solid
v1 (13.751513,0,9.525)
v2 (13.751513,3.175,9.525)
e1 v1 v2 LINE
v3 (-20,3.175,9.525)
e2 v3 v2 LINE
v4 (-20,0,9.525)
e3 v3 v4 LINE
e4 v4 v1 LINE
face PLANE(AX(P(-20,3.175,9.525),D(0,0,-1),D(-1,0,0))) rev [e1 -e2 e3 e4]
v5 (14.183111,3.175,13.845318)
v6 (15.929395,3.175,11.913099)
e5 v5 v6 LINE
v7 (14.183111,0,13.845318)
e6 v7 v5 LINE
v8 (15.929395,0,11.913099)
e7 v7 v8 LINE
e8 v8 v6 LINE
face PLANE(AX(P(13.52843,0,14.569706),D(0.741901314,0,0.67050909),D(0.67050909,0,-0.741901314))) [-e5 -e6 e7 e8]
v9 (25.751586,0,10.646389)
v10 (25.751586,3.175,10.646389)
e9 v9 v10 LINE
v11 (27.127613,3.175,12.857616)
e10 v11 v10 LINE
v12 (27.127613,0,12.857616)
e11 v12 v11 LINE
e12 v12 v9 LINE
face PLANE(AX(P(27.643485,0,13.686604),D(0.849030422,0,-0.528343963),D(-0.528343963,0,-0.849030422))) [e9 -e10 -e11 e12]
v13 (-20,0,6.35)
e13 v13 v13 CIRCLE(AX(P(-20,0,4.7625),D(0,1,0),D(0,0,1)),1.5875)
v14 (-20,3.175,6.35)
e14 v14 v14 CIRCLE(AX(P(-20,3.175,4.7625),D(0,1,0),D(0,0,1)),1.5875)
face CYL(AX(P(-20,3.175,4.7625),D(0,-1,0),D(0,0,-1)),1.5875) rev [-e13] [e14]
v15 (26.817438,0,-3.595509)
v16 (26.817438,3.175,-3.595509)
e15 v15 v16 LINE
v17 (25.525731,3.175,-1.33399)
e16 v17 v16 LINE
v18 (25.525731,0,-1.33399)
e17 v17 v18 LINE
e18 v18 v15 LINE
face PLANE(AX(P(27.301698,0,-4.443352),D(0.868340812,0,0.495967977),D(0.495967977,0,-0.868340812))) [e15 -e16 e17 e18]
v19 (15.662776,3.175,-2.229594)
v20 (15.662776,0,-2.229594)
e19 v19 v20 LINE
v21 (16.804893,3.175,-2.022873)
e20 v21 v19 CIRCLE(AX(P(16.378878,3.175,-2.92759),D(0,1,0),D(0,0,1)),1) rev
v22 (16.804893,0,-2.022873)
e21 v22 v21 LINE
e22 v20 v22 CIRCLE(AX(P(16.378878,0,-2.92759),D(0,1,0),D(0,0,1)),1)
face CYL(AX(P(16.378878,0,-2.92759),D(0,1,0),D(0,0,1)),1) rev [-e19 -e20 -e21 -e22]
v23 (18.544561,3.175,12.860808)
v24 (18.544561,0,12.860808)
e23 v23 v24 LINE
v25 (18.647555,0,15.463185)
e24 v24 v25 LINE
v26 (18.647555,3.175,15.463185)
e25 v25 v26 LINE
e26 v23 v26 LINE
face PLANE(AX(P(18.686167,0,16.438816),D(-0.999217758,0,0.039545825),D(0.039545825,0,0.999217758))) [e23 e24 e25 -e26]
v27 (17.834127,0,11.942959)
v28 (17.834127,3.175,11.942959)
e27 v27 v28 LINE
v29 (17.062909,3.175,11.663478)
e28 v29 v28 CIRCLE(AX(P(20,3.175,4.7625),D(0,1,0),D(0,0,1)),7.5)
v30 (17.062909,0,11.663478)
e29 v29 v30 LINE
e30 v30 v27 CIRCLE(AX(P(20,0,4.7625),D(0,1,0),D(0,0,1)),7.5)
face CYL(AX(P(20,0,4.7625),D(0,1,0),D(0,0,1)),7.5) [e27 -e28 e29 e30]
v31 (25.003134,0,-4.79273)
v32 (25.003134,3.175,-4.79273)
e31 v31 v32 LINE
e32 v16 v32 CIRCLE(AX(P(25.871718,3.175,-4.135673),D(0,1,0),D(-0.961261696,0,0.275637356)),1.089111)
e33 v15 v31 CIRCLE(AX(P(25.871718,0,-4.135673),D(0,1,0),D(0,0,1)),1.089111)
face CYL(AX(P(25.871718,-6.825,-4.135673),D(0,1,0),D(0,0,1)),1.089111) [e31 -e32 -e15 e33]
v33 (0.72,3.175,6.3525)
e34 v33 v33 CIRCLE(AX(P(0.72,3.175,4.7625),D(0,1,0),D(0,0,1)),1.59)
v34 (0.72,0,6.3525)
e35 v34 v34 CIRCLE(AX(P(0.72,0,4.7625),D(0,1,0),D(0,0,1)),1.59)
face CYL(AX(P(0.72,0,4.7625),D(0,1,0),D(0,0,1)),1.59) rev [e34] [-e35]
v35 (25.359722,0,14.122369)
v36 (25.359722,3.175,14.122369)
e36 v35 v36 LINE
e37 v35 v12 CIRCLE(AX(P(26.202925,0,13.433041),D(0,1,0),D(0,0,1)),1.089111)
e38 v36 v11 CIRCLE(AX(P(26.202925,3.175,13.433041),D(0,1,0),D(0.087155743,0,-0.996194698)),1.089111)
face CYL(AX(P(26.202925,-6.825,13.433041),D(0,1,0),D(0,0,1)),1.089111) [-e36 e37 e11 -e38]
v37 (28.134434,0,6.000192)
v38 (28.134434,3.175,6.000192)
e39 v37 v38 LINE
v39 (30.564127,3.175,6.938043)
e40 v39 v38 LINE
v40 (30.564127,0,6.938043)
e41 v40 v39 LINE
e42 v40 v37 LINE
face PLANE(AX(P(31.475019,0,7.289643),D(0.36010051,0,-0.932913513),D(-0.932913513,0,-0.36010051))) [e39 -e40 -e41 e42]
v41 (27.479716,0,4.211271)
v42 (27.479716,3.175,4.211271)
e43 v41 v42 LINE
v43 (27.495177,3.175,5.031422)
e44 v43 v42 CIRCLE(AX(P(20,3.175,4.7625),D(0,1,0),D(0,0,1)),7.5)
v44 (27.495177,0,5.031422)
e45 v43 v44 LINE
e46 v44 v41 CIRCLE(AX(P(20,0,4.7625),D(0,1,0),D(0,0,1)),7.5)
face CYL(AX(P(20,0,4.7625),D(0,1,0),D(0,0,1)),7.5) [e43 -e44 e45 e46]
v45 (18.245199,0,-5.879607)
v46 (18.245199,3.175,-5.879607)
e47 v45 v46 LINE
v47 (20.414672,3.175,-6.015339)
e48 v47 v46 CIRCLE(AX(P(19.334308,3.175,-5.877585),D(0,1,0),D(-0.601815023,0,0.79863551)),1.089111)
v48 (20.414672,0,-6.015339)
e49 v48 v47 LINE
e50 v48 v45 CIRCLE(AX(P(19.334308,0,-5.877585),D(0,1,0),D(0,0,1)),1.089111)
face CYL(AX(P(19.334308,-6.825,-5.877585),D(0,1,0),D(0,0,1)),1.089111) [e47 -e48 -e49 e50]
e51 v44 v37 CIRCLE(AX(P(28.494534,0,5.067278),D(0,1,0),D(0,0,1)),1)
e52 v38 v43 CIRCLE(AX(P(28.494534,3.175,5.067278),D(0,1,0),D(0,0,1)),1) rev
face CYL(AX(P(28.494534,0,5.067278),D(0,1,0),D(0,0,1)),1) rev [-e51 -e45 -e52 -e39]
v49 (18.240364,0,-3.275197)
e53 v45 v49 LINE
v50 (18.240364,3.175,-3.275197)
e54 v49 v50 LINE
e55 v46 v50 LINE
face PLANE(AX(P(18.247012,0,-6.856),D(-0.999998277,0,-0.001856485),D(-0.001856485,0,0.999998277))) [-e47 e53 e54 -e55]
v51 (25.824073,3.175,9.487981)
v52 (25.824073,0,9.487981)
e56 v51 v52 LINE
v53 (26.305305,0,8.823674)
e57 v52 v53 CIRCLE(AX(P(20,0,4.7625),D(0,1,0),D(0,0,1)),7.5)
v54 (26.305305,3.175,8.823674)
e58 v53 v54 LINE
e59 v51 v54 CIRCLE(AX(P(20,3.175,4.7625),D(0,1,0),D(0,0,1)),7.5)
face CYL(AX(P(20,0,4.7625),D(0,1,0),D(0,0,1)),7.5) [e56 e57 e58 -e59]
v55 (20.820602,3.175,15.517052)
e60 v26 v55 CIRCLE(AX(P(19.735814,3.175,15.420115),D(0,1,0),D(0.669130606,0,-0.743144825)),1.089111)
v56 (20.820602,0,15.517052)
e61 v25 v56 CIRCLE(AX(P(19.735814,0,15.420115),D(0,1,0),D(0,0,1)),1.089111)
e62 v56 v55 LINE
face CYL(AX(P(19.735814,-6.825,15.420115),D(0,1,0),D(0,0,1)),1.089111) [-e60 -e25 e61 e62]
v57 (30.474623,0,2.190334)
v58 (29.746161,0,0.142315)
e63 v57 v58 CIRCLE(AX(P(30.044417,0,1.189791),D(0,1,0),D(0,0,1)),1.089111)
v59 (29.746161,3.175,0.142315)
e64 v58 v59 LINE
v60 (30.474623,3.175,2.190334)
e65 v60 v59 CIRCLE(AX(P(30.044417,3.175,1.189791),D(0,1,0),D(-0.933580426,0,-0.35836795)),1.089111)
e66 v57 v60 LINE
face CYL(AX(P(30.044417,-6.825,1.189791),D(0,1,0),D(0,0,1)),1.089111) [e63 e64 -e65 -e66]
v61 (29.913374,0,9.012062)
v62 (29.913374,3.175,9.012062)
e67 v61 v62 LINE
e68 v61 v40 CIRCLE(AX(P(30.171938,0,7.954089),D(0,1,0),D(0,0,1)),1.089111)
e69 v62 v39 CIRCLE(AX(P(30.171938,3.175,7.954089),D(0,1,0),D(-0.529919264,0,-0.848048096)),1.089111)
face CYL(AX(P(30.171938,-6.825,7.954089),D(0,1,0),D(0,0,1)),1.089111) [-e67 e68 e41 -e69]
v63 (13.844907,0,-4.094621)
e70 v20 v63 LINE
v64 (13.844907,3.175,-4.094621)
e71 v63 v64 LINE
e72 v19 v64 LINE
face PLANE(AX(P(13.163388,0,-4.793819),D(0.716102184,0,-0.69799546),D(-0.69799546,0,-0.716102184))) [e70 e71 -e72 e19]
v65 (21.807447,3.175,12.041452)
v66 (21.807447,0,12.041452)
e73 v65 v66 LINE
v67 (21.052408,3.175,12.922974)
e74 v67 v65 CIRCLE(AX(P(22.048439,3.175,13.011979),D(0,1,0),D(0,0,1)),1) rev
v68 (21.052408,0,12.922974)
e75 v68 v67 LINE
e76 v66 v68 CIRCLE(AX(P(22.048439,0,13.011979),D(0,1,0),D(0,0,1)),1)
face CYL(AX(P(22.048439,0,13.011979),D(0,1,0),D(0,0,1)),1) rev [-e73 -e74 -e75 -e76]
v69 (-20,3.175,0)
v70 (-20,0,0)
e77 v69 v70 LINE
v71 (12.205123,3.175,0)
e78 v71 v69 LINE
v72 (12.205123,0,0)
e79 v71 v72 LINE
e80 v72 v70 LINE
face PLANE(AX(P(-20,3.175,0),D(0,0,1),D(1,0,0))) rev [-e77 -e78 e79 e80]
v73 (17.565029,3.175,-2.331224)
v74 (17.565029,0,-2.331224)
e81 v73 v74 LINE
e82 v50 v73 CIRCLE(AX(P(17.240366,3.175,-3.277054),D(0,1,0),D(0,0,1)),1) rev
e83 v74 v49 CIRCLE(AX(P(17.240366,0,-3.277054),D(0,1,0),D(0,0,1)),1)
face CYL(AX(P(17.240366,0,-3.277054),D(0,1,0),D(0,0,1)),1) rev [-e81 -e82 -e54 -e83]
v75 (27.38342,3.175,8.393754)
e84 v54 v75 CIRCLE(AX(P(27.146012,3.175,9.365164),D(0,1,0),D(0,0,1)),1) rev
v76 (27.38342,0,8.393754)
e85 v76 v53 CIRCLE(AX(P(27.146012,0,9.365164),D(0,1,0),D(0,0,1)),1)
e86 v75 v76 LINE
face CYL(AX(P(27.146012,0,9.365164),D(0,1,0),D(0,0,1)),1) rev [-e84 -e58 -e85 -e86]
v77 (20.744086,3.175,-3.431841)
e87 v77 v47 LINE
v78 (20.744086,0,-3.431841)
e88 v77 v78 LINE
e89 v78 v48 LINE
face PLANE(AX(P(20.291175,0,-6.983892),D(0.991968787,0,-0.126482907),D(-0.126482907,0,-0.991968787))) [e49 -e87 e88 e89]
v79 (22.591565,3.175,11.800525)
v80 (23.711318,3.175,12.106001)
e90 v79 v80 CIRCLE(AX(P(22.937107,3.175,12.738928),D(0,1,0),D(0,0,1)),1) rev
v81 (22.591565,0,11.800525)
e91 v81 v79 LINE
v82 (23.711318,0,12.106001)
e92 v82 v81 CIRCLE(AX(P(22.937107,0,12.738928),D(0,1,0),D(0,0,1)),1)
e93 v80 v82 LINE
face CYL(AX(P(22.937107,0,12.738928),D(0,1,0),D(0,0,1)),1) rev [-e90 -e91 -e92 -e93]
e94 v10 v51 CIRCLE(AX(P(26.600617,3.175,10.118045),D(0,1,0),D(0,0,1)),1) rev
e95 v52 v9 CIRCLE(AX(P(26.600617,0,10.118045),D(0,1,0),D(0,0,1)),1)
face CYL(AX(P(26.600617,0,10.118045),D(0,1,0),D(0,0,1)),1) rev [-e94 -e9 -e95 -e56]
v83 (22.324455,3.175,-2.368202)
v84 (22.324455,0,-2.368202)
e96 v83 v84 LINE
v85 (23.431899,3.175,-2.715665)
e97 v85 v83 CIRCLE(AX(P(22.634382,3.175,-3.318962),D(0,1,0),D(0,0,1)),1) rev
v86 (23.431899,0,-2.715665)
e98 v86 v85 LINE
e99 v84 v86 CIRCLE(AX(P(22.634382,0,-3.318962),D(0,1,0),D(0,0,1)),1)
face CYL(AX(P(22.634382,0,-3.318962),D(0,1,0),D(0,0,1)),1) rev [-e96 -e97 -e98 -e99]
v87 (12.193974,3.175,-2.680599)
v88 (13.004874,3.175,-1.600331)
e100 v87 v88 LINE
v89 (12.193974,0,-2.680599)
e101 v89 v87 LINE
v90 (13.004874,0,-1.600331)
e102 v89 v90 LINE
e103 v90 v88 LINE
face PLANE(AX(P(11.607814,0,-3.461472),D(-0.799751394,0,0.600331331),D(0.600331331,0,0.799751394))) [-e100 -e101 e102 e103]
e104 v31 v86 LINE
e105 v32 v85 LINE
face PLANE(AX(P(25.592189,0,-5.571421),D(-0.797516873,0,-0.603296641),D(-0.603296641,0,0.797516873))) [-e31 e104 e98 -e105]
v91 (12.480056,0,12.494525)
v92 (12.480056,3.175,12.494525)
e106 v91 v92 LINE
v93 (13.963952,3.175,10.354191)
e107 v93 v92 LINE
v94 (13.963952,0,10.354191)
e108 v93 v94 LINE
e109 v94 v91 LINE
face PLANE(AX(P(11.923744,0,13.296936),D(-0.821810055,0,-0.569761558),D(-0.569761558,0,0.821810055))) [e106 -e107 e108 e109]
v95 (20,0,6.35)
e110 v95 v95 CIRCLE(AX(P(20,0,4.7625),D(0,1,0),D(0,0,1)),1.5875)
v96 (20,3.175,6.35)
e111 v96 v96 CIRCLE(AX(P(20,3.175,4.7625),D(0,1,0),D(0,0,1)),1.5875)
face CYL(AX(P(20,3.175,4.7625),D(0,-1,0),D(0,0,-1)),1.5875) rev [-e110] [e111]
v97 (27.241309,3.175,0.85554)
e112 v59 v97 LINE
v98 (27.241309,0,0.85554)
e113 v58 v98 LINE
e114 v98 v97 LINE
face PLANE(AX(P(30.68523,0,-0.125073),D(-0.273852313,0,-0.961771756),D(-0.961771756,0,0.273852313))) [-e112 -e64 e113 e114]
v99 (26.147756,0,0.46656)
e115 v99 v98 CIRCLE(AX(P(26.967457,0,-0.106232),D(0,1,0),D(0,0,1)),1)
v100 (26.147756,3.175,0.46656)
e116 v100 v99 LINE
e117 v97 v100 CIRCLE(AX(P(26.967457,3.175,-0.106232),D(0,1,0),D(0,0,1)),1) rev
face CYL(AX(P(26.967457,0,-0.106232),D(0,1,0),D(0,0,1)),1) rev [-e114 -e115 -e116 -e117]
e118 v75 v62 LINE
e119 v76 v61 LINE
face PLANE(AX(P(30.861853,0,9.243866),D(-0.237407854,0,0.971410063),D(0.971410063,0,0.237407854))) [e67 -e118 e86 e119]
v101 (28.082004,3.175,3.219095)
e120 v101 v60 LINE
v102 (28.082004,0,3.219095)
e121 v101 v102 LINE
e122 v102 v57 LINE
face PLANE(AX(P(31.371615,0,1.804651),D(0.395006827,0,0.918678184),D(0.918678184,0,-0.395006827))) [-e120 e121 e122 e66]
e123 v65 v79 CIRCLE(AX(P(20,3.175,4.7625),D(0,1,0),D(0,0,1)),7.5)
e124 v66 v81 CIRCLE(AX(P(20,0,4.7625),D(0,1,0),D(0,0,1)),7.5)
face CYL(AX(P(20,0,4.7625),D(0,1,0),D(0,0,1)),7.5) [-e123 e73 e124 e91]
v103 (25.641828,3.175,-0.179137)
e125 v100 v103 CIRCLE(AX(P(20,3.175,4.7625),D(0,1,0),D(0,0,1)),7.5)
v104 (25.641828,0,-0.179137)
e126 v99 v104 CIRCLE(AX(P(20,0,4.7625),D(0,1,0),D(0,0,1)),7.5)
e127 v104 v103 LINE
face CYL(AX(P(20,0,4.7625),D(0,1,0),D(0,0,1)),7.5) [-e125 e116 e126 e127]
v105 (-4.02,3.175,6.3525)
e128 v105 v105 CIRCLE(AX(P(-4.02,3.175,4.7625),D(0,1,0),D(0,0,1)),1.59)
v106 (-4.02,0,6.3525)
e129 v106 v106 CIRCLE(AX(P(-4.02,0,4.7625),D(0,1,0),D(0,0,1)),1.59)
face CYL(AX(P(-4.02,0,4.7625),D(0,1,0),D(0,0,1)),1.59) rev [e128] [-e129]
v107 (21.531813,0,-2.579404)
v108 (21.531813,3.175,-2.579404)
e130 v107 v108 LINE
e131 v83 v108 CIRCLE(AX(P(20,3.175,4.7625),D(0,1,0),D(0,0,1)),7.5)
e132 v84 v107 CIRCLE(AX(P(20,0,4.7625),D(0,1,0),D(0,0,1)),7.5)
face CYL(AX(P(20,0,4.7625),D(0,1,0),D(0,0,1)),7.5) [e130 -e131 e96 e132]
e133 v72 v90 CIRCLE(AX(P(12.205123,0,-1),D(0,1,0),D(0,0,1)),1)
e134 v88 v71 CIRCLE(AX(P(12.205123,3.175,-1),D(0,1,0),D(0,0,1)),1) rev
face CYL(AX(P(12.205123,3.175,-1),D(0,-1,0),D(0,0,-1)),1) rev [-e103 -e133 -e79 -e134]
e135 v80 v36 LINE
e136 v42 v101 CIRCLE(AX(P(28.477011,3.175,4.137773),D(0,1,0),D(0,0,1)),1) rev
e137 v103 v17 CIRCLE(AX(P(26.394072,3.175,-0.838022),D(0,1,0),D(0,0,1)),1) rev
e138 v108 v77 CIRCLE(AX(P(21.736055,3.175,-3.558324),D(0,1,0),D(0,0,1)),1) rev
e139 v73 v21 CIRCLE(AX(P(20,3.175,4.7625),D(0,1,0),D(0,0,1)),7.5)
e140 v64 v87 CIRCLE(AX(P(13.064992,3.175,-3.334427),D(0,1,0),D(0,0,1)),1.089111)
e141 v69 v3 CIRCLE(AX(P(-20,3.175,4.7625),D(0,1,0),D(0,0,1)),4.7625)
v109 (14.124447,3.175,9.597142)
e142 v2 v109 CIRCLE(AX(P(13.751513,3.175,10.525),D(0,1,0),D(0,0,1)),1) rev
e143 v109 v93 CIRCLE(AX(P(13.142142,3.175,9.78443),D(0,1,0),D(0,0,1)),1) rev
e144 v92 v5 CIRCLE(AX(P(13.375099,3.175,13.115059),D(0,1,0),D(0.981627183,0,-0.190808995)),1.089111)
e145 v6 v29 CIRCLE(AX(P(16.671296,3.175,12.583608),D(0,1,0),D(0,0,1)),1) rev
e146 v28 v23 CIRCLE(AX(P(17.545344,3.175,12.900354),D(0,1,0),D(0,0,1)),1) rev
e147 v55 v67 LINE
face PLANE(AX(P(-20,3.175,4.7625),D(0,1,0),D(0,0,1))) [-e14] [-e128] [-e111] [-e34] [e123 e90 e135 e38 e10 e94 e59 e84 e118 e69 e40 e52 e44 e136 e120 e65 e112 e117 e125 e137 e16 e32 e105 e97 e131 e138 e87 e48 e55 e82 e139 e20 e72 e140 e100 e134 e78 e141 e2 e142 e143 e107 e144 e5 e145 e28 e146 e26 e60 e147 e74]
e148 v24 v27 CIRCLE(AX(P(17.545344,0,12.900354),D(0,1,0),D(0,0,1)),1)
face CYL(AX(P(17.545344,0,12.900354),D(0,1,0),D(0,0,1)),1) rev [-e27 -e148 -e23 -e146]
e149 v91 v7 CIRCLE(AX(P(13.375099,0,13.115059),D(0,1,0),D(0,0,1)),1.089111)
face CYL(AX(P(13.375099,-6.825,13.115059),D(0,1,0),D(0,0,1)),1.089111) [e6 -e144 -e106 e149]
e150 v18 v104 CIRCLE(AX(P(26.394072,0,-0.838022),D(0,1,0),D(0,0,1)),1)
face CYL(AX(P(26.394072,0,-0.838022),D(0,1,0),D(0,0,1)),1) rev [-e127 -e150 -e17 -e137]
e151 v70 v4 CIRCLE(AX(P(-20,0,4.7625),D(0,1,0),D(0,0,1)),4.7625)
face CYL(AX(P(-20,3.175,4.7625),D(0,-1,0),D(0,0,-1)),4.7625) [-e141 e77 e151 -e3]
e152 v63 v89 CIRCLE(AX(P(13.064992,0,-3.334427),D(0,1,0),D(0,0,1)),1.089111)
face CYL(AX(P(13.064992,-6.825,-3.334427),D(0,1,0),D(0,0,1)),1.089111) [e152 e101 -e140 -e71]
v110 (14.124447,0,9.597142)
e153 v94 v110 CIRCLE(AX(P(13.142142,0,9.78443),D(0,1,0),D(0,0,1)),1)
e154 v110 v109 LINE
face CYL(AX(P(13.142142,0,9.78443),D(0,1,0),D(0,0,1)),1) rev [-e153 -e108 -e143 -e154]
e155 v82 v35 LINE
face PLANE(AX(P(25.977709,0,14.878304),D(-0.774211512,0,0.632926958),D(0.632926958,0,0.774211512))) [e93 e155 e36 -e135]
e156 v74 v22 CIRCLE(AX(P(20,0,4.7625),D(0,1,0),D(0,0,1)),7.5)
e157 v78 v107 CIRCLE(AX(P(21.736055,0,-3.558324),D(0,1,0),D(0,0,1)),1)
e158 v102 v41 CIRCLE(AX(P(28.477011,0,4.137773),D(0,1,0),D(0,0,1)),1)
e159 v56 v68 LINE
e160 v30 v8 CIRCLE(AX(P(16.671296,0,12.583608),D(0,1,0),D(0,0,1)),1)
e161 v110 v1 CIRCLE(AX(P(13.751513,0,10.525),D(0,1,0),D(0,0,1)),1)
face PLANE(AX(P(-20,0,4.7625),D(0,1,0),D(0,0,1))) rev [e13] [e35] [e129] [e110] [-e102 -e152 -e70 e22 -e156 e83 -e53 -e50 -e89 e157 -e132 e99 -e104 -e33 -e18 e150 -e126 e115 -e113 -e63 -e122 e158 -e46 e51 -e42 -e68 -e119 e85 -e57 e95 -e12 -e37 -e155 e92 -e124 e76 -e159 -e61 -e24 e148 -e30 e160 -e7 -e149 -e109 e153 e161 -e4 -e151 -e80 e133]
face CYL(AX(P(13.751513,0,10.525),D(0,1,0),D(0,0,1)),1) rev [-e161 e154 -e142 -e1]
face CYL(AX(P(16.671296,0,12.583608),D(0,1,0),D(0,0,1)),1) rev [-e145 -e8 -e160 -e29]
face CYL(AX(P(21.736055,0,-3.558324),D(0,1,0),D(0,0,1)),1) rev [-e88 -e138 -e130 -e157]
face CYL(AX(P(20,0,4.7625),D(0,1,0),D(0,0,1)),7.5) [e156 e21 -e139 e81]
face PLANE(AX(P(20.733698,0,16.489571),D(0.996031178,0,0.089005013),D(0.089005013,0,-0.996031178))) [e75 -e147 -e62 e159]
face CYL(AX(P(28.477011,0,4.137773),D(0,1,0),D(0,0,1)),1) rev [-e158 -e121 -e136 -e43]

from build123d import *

# Parameters (mm, degrees)
CROQUIS1_R              = 1.5875
SALIENTE_EXTRUIR1_DEPTH = 3.175
SALIENTE_EXTRUIR2_START = -3.175
CROQUIS2_R              = 7.5
CROQUIS2_R_2            = 1.5875
SALIENTE_EXTRUIR2_DEPTH = 3.175
SALIENTE_EXTRUIR3_START = -3.175
SALIENTE_EXTRUIR3_DEPTH = 3.175
CORTAR_EXTRUIR4_START   = -10
CORTAR_EXTRUIR4_DEPTH   = 10
MATRIZC1_COUNT          = 8
MATRIZC1_ANGLE          = 259
REDONDEO1_R             = 1
ESQUISSE1_R             = 1.59
ENL_V_MAT_EXTRU_1_DEPTH = 36.494905734


with BuildPart() as part:
    # Croquis1 → Saliente-Extruir1 (new body)
    with BuildSketch(Plane(origin=(0, 0, 0), x_dir=(1, 0, 0), z_dir=(0, 1, 0))):
        with BuildLine():
            Line((-20, 0), (20, 0))
            ThreePointArc((20, 0), (24.7625, -4.7625), (20, -9.525))
            Line((20, -9.525), (-20, -9.525))
            ThreePointArc((-20, -9.525), (-24.7625, -4.7625), (-20, 0))
        make_face()
        with Locations(Location((-20, -4.7625, 0), (0, 0, 270))):
            Circle(CROQUIS1_R, mode=Mode.SUBTRACT)
        with Locations(Location((20, -4.7625, 0), (0, 0, 270))):
            Circle(CROQUIS1_R, mode=Mode.SUBTRACT)
    extrude(amount=SALIENTE_EXTRUIR1_DEPTH)

    # Croquis2 → Saliente-Extruir2 (add)
    with BuildSketch(Plane(origin=(0, 3.175, 0), x_dir=(1, 0, 0), z_dir=(0, 1, 0)).offset(SALIENTE_EXTRUIR2_START)):
        with Locations((20, -4.7625)):
            Circle(CROQUIS2_R)
        with Locations(Location((20, -4.7625, 0), (0, 0, 270))):
            Circle(CROQUIS2_R_2, mode=Mode.SUBTRACT)
    extrude(amount=SALIENTE_EXTRUIR2_DEPTH)

    # Croquis8 → Saliente-Extruir3 (add)
    with BuildSketch(Plane(origin=(0, 3.175, 0), x_dir=(1, 0, 0), z_dir=(0, 1, 0)).offset(SALIENTE_EXTRUIR3_START)):
        with BuildLine():
            Line((11.607813982, 3.461471902), (14.206158981, 0))
            ThreePointArc((14.206158981, 0), (15.121179891, 0.933736858), (16.184441281, 1.694396442))
            Line((16.184441281, 1.694396442), (13.163387879, 4.793819098))
            ThreePointArc((13.163387879, 4.793819098), (12.356515163, 4.161604411), (11.607813982, 3.461471902))
        make_face()
    saliente_extruir3 = extrude(amount=SALIENTE_EXTRUIR3_DEPTH)

    # Croquis9 → Cortar-Extruir4 (cut)
    with BuildSketch(Plane(origin=(0, 3.175, 0), x_dir=(1, 0, 0), z_dir=(0, 1, 0)).offset(CORTAR_EXTRUIR4_START)):
        with BuildLine():
            ThreePointArc((12.35651523, 4.161604469), (11.974526132, 3.819706546), (11.607813982, 3.461471902))
            Line((11.607813982, 3.461471902), (12.19397403, 2.680599255))
            ThreePointArc((12.19397403, 2.680599255), (11.982381708, 3.453243741), (12.35651523, 4.161604469))
        make_face()
        with BuildLine():
            ThreePointArc((13.163387879, 4.793819098), (12.753054069, 4.486514795), (12.35651523, 4.161604469))
            ThreePointArc((12.35651523, 4.161604469), (13.113956627, 4.422436237), (13.844906618, 4.094621057))
            Line((13.844906618, 4.094621057), (13.163387879, 4.793819098))
        make_face()
    cortar_extruir4 = extrude(amount=CORTAR_EXTRUIR4_DEPTH, mode=Mode.SUBTRACT)

    # MatrizC1: Saliente-Extruir3, Cortar-Extruir4 ×8 about axis
    matrizc1_axis = Axis((20, 0, 4.7625), (0, -1, 0))
    add([saliente_extruir3.rotate(matrizc1_axis, i * MATRIZC1_ANGLE / (MATRIZC1_COUNT - 1)) for i in range(1, MATRIZC1_COUNT)])
    add([cortar_extruir4.rotate(matrizc1_axis, i * MATRIZC1_ANGLE / (MATRIZC1_COUNT - 1)) for i in range(1, MATRIZC1_COUNT)], mode=Mode.SUBTRACT)

    # Redondeo1
    # the kernel refuses this fillet: 1 mm, written as the material it adds along each edge
    with BuildSketch(Plane(origin=(27.395406089, 0, 3.514313802), x_dir=(0.12009264391370789, 0, 0.9927626891044079), z_dir=(0, 1, 0)), Plane(origin=(26.657411119, 0, 8.216320666), x_dir=(-0.501549250802915, 0, 0.8651290938461349), z_dir=(0, 1, 0)), Plane(origin=(23.238283761, 0, 11.527373856), x_dir=(-0.9212027273713431, 0, 0.389082941136718), z_dir=(0, 1, 0)), Plane(origin=(18.515005687, 0, 12.114016299), x_dir=(-0.9698611692594302, 0, -0.243658187555294), z_dir=(0, 1, 0)), Plane(origin=(14.389777858, 0, 9.739990082), x_dir=(-0.6279284118017822, 0, -0.7782711029275668), z_dir=(0, 1, 0)), Plane(origin=(16.184441281, 0, -1.694396442), x_dir=(0.8837864601497757, 0, -0.4678904710035554), z_dir=(0, 1, 0)), Plane(origin=(20.838616598, 0, -2.690467342), x_dir=(0.9874067650142349, 0, 0.15820202402031353), z_dir=(0, 1, 0)), Plane(origin=(25.155056708, 0, -0.685012307), x_dir=(0.6933697506528057, 0, 0.7205819792915072), z_dir=(0, 1, 0))) as redondeo1_piece_1:
        with BuildLine():
            CenterArc((0.748840141, 0.998904162), REDONDEO1_R, 196.368950511, 70.948483307)
            Line((-0.210626698, 0.717082614), (0, 0))
            ThreePointArc((0, 0), (0.351018816, 0.008218784), (0.702037632, 0))
        make_face()
    extrude(amount=3.175)
    with BuildSketch(Plane(origin=(26.522503707, 0, 1.06021079), x_dir=(0.9617717559465732, 0, -0.2738523132336944), z_dir=(0, 1, 0)), Plane(origin=(27.437196341, 0, 5.731061088), x_dir=(0.9329135130884484, 0, 0.36010050971495355), z_dir=(0, 1, 0)), Plane(origin=(25.35671448, 0, 10.011843767), x_dir=(0.5283439627642348, 0, 0.8490304217226758), z_dir=(0, 1, 0)), Plane(origin=(21.11892846, 0, 12.178563585), x_dir=(-0.0890050127232042, 0, 0.9960311780813601), z_dir=(0, 1, 0)), Plane(origin=(16.430517523, 0, 11.358619681), x_dir=(-0.6705090902301596, 0, 0.7419013141373477), z_dir=(0, 1, 0)), Plane(origin=(18.238976871, 0, -2.527822183), x_dir=(0.0018564846529317855, 0, -0.9999982767308818), z_dir=(0, 1, 0)), Plane(origin=(22.981009808, 0, -2.119620351), x_dir=(0.6032966406304949, 0, -0.7975168734289948), z_dir=(0, 1, 0))) as redondeo1_piece_2:
        with BuildLine():
            CenterArc((0.747376131, 1), REDONDEO1_R, 199.051516693, 70.948483307)
            ThreePointArc((-0.197849332, 0.673581828), (-0.091039016, 0.339107144), (0, 0))
            Line((0, 0), (0.747376131, 0))
        make_face()
    extrude(amount=3.175)
    with BuildSketch(Plane(origin=(14.206158981, 3.175, 0), x_dir=(-1, 0, 0), z_dir=(0, -1, 0))) as redondeo1_piece_3:
        with BuildLine():
            CenterArc((REDONDEO1_R * 2.00103600097, REDONDEO1_R), REDONDEO1_R, 143.106368796, 126.893631204)
            Line((REDONDEO1_R * 1.20128460683, REDONDEO1_R * 1.6003313315), (0, 0))
            Line((0, 0), (REDONDEO1_R * 2.00103600097, 0))
        make_face()
    extrude(amount=3.175)
    with BuildSketch(Plane(origin=(14.206158981, 3.175, 9.525), x_dir=(-1, 0, 0), z_dir=(0, -1, 0))) as redondeo1_piece_4:
        with BuildLine():
            CenterArc((0.454646298, -1), REDONDEO1_R, 90, 47.317031956)
            ThreePointArc((-0.280469857, -0.322058824), (-0.137942125, -0.163026135), (0, 0))
            Line((0, 0), (0.454646298, 0))
        make_face()
    extrude(amount=3.175)

    # Esquisse1 → Enlèv. mat.-Extru.1 (cut, through all)
    with BuildSketch(Plane(origin=(0, 3.175, 0), x_dir=(1, 0, 0), z_dir=(0, 1, 0))):
        with Locations(Location((0.72, -4.7625, 0), (0, 0, 270))):
            Circle(ESQUISSE1_R)
        with Locations(Location((-4.02, -4.7625, 0), (0, 0, 270))):
            Circle(ESQUISSE1_R)
    extrude(amount=-ENL_V_MAT_EXTRU_1_DEPTH, mode=Mode.SUBTRACT)


solid = part.part
